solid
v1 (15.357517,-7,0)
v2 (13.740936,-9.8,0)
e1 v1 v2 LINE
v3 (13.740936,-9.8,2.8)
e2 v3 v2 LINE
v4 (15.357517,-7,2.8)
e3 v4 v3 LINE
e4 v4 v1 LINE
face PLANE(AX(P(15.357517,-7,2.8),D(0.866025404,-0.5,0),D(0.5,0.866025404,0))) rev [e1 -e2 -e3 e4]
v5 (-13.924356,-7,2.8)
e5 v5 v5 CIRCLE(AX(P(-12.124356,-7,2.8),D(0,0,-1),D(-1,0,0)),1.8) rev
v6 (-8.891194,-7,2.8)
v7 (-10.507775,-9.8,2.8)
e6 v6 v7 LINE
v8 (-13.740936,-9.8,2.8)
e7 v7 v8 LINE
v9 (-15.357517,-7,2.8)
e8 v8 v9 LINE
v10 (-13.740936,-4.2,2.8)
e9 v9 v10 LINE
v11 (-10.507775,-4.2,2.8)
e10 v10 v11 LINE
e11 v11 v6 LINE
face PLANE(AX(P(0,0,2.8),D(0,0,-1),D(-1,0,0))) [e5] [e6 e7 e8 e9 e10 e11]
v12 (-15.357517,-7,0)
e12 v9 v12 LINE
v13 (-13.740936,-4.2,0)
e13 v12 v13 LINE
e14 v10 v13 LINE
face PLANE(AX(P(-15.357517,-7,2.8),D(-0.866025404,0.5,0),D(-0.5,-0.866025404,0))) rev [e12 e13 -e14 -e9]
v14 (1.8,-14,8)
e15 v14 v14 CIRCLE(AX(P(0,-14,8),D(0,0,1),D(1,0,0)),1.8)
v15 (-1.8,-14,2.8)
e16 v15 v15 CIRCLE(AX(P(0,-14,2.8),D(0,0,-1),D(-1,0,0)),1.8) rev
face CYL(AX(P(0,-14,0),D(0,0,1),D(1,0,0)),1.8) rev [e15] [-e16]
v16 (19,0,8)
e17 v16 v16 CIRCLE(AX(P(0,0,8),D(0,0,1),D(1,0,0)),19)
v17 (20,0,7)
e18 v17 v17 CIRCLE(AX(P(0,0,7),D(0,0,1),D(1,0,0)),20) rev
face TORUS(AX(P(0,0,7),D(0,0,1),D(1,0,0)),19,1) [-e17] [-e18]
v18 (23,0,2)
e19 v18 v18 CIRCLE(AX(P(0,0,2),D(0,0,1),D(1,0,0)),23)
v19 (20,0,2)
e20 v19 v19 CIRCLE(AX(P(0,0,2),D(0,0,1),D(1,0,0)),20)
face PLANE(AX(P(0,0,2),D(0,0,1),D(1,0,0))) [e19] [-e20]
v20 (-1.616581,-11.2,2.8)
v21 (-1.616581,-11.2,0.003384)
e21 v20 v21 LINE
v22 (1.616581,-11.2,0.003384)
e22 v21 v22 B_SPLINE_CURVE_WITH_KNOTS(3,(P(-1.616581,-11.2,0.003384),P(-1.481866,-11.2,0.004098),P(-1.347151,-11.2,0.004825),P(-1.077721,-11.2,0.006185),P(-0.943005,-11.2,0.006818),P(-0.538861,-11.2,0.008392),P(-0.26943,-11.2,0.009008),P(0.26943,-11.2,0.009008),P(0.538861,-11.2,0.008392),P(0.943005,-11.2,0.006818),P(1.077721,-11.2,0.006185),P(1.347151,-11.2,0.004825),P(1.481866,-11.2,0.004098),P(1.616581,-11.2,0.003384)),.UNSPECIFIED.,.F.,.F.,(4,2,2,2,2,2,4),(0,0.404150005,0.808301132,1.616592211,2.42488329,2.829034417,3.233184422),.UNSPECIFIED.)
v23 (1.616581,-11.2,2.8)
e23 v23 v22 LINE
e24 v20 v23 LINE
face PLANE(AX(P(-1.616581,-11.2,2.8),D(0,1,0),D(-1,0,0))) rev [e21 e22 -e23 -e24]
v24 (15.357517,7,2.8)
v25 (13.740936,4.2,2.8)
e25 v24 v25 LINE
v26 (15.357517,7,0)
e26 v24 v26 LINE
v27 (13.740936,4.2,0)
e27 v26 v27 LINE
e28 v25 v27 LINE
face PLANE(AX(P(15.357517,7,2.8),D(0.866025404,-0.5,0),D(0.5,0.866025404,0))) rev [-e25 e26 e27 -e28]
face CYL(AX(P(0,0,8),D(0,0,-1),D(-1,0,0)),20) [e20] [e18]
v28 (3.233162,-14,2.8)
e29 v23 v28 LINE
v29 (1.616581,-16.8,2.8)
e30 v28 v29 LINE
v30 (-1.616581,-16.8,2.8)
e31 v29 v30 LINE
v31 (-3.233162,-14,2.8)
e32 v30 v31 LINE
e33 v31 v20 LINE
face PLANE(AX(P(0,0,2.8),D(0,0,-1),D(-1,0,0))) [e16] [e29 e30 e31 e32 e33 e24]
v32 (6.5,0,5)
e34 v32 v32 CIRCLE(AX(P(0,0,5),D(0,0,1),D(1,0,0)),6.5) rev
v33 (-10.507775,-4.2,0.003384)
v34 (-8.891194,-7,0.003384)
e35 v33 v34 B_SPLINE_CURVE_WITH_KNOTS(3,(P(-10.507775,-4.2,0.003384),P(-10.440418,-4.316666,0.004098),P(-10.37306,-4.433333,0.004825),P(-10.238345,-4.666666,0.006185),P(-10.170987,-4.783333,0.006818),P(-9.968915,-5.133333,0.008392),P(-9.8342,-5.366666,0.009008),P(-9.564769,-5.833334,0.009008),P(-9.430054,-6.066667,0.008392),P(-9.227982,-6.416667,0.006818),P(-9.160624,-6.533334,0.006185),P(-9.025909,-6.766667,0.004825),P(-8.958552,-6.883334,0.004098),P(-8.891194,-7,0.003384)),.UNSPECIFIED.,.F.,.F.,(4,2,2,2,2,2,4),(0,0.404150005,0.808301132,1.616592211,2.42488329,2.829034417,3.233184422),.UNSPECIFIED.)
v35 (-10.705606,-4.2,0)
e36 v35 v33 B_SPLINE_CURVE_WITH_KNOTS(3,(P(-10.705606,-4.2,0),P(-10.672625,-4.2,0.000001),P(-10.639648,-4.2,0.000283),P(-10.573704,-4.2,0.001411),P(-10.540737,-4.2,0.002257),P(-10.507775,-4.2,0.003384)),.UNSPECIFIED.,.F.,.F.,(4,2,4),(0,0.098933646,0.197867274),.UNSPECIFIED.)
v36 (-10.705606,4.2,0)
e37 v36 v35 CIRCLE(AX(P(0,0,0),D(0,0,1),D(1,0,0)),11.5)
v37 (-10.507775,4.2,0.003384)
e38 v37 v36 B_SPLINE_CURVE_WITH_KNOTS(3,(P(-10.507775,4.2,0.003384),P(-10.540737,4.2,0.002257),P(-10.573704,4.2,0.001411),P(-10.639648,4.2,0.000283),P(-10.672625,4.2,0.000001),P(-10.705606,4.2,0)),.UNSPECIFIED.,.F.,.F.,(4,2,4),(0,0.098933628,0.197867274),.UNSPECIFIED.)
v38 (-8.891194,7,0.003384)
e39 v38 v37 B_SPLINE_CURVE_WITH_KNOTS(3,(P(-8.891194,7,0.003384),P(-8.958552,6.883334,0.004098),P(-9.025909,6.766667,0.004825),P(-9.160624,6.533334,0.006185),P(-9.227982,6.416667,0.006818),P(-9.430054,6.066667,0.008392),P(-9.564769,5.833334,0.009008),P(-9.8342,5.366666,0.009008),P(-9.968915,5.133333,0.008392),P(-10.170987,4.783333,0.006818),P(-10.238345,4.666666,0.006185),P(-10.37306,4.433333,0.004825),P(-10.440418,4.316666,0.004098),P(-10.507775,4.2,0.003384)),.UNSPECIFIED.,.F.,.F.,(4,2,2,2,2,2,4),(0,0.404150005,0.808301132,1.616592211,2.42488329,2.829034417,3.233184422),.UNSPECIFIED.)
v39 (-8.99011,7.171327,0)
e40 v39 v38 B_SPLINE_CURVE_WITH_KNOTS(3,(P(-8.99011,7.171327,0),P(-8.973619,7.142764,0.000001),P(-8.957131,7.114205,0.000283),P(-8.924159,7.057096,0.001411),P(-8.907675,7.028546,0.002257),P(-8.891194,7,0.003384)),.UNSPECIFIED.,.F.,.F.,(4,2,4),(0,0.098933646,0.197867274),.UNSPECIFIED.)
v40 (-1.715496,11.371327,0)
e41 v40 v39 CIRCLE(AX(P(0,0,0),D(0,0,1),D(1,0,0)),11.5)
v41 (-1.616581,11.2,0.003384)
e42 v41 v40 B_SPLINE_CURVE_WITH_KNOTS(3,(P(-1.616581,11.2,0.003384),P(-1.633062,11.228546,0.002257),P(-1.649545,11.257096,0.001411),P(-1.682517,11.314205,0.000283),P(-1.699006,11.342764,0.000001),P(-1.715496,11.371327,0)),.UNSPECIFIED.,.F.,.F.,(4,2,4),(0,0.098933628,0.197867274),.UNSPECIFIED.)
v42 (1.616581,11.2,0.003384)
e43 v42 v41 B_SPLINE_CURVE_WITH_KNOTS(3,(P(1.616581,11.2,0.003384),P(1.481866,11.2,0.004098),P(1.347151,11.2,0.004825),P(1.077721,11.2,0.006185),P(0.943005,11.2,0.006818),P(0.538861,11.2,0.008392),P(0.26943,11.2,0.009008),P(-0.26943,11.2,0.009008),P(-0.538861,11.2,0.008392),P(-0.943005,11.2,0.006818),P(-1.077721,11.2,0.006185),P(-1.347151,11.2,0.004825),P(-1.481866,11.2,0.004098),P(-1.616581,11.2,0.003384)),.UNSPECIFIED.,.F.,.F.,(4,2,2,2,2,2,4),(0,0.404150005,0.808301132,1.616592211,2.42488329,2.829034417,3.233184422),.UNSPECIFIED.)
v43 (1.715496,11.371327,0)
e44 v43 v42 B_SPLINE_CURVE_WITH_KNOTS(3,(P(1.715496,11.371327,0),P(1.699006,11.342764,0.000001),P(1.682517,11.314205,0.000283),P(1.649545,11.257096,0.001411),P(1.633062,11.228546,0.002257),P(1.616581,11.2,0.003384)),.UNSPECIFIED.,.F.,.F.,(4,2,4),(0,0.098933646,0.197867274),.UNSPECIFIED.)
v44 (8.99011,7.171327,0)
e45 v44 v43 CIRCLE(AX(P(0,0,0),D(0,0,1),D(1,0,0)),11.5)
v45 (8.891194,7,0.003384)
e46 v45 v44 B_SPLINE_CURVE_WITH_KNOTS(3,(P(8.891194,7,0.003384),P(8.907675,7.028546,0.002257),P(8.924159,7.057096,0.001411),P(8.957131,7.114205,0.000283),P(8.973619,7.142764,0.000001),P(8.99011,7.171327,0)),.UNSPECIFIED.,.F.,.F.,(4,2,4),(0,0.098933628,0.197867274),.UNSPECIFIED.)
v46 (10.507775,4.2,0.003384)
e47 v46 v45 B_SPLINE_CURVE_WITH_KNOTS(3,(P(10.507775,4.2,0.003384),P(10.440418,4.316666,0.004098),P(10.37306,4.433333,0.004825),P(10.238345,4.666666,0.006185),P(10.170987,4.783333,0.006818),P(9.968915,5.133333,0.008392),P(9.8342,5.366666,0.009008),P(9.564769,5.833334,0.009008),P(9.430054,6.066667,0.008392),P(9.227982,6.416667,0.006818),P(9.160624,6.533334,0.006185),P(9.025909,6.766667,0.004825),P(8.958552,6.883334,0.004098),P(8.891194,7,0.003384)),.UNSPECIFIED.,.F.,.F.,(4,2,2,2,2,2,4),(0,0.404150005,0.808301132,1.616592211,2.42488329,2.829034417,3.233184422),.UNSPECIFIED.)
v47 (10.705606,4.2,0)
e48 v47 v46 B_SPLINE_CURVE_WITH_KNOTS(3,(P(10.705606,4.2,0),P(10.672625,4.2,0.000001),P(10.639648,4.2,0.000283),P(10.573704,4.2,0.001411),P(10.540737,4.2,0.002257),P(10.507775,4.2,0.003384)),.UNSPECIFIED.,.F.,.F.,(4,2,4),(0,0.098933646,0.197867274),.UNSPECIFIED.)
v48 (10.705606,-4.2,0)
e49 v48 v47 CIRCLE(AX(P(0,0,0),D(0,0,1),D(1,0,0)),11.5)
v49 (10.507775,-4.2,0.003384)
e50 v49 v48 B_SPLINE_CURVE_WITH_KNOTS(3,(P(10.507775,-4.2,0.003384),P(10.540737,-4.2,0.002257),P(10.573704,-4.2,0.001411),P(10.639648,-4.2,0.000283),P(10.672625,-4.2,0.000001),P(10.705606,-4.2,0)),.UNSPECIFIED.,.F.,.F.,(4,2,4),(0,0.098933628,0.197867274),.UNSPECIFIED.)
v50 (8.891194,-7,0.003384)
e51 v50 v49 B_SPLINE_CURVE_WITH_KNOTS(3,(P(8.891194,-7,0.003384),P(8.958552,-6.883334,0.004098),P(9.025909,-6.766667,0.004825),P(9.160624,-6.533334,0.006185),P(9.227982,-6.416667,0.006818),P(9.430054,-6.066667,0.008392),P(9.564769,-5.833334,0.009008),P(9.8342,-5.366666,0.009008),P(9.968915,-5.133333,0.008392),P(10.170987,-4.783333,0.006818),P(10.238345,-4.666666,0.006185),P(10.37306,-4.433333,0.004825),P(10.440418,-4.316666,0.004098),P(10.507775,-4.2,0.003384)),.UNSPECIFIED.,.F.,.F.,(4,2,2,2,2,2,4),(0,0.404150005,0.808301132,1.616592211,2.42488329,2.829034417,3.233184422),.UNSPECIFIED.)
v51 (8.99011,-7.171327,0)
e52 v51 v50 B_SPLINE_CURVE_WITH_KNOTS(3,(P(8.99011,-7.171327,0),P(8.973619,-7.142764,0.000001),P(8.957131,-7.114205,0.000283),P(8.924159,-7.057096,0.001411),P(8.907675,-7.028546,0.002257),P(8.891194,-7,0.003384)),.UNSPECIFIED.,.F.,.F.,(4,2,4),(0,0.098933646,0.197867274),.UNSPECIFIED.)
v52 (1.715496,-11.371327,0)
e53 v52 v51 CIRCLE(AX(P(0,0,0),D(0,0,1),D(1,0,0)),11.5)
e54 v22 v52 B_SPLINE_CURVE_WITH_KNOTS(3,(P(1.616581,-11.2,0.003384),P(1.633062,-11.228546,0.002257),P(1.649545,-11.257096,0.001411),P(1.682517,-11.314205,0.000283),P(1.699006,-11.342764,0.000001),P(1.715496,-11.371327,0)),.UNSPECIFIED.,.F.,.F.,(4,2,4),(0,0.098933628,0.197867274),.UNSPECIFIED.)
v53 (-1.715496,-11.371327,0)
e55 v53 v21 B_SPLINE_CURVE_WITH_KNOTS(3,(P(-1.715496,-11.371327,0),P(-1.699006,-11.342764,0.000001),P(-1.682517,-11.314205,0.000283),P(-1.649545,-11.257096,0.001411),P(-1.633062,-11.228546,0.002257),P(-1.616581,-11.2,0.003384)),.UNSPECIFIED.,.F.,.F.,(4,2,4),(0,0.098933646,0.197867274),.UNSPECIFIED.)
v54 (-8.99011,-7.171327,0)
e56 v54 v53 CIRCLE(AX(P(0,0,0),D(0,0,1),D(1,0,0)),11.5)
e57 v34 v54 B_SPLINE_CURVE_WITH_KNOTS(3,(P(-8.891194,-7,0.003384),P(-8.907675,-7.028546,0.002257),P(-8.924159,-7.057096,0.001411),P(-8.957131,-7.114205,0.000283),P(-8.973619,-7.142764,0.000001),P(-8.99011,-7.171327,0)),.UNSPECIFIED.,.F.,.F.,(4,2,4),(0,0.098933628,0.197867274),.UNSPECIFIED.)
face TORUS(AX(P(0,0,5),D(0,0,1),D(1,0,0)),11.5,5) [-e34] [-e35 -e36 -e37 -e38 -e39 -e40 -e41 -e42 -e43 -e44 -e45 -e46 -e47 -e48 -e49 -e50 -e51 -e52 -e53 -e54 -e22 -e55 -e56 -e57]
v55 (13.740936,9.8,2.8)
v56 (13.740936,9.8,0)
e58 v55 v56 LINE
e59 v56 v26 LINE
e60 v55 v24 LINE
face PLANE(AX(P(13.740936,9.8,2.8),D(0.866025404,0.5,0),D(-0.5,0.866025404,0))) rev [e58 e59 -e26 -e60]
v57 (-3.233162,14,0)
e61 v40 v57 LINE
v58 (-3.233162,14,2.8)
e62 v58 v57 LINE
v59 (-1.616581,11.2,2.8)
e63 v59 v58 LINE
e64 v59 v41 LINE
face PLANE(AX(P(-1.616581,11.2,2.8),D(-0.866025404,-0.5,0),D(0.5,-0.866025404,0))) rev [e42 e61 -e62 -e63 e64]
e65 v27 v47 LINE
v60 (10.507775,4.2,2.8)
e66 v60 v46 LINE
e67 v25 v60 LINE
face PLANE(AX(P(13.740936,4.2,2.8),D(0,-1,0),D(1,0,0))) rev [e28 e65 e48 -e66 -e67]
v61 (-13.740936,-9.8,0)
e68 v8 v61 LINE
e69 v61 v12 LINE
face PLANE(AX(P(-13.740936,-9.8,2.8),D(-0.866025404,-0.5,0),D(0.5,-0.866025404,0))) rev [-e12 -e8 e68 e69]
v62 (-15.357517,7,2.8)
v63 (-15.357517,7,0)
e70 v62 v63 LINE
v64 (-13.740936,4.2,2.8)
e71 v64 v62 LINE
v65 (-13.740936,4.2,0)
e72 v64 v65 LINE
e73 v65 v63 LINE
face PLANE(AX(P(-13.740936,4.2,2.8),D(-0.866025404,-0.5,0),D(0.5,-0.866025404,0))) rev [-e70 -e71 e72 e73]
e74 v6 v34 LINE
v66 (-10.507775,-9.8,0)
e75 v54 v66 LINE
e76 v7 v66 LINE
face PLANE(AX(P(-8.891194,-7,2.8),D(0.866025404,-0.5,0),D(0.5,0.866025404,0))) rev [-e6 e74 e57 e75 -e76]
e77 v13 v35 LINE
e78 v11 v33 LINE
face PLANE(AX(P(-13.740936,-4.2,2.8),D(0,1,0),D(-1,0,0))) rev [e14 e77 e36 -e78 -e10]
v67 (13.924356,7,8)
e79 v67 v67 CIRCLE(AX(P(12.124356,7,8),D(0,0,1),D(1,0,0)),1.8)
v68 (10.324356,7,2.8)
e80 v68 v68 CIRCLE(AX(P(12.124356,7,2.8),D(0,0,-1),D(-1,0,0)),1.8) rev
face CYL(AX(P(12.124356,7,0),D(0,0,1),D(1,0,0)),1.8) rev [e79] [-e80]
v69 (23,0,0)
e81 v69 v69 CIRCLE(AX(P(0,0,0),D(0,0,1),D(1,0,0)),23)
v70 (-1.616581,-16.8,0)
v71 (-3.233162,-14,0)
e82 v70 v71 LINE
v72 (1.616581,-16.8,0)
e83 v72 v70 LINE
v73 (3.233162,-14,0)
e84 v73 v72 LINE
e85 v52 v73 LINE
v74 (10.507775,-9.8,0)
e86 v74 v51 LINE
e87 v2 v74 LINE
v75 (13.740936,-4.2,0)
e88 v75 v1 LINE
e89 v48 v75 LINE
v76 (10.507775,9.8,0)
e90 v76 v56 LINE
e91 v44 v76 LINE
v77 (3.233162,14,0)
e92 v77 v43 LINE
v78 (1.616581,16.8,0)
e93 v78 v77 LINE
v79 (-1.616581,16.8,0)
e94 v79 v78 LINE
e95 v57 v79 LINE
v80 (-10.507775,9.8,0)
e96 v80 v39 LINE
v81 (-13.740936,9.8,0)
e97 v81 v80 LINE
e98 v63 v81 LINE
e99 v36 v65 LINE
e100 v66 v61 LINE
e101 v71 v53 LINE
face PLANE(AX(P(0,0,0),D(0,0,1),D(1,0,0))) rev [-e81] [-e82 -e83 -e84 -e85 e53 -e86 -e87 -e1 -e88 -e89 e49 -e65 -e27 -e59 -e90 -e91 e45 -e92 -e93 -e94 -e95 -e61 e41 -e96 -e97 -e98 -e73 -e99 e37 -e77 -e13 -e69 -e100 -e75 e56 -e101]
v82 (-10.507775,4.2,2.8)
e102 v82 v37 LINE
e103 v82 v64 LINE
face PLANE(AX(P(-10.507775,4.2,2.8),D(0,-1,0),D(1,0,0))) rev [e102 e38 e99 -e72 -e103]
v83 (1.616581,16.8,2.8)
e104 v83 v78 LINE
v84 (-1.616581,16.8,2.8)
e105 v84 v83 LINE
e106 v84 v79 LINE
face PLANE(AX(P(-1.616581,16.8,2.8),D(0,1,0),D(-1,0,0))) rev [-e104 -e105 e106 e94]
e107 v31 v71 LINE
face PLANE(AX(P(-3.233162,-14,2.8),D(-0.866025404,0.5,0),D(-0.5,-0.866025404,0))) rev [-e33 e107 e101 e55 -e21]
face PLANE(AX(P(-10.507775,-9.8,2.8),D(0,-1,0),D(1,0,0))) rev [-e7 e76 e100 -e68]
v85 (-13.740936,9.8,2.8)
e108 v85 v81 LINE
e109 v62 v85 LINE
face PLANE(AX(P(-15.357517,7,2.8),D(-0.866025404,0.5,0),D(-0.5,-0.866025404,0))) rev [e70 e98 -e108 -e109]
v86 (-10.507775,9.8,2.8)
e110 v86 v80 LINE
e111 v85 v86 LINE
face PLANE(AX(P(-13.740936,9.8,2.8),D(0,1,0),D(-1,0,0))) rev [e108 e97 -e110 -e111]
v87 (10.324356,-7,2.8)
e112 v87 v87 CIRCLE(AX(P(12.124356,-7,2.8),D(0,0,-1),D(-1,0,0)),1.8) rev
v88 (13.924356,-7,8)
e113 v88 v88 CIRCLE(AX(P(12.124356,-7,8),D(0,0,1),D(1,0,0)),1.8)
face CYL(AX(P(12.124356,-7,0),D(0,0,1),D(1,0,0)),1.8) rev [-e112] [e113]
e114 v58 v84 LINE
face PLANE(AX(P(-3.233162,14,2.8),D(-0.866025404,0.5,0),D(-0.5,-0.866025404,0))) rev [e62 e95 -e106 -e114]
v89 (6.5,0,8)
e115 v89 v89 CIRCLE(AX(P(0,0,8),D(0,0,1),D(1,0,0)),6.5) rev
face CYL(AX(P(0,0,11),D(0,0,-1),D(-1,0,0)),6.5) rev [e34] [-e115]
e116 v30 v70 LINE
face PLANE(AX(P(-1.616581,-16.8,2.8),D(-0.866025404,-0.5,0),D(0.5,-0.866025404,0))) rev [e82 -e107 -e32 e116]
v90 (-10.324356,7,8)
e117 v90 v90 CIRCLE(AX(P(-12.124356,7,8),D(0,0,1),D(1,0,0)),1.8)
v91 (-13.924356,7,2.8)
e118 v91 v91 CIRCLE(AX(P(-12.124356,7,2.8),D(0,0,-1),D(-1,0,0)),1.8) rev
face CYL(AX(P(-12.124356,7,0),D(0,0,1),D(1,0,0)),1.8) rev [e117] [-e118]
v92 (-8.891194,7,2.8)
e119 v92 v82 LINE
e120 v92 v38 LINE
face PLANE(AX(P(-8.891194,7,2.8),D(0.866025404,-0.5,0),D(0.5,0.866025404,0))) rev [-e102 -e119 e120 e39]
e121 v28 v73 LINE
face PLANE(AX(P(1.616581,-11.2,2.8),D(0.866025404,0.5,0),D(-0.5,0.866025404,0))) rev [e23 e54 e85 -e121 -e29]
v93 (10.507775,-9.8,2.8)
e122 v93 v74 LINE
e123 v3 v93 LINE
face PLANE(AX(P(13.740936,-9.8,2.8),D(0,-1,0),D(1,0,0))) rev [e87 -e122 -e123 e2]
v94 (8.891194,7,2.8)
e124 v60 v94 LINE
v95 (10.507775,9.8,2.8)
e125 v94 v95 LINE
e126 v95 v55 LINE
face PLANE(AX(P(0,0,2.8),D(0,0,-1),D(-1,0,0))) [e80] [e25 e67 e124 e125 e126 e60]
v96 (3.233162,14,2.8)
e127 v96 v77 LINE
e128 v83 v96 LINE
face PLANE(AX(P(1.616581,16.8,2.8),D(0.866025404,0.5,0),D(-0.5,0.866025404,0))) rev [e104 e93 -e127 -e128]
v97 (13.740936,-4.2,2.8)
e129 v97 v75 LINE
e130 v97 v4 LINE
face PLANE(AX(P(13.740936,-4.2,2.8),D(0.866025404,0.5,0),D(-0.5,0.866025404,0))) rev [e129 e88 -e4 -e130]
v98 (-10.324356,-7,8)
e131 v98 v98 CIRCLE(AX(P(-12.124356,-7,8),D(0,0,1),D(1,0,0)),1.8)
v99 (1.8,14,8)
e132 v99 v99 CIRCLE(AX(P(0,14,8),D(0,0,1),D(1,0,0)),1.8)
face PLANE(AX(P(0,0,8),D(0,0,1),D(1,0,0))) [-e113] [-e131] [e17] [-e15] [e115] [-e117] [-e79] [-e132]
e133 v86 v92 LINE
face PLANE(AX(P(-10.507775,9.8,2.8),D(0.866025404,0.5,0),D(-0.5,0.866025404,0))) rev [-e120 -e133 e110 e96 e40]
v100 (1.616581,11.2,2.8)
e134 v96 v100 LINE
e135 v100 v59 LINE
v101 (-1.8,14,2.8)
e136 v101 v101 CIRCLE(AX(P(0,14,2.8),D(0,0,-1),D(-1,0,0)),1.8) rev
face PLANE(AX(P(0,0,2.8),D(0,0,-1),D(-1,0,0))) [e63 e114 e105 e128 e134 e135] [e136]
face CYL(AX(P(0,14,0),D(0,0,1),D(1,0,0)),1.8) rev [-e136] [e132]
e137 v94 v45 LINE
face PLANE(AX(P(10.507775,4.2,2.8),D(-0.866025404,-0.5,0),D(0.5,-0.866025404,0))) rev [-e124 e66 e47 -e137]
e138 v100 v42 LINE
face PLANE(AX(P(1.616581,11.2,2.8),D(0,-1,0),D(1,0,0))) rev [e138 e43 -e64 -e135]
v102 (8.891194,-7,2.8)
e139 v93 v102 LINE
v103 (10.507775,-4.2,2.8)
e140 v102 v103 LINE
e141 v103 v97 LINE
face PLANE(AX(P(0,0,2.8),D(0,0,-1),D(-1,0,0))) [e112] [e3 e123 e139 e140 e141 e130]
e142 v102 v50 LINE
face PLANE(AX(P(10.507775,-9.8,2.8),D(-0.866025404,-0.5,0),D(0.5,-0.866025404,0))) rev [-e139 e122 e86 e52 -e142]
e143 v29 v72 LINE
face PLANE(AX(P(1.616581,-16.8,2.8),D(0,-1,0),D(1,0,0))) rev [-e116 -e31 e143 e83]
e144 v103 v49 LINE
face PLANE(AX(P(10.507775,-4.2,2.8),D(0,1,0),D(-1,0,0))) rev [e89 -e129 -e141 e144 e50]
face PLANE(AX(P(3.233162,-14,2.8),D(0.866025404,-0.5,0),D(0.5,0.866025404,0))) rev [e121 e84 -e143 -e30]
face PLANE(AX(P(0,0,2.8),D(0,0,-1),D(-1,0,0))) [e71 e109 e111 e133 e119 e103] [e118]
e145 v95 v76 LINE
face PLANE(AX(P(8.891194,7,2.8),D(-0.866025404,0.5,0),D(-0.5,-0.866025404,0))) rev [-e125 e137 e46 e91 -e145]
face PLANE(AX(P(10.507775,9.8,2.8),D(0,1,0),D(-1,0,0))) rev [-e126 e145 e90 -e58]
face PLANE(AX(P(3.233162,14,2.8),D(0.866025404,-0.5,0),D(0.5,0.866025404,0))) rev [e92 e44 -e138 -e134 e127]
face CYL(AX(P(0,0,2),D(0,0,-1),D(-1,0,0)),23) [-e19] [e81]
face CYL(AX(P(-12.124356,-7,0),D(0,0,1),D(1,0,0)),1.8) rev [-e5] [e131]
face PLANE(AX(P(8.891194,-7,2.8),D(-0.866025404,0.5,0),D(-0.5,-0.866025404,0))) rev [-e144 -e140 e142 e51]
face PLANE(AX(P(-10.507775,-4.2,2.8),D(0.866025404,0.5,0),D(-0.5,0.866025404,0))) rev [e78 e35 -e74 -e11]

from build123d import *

# Parameters (mm, degrees)
SKETCH_1_R          = 23
EXTRUDE_1_DEPTH     = 2
SKETCH_2_R          = 20
EXTRUDE_2_DEPTH     = 6
SKETCH_3_R          = 1.8
CUT_EXTRUDE_1_DEPTH = 34.496268449
SKETCH_4_R          = 10
CUT_EXTRUDE_2_DEPTH = 34.496268449
FILLET_1_R          = 1
CUT_EXTRUDE_5_DEPTH = 2.8
EXTRUDE_START       = -11
SKETCH_9_R          = 10
SKETCH_9_R_2        = 6.5
EXTRUDE_3_DEPTH     = 11
SKETCH_10_R         = 10
SKETCH_10_R_2       = 8.5
CUT_EXTRUDE_6_DEPTH = 3
FILLET_3_R          = 1.5
FILLET_4_R          = 5
SKETCH_11_R         = 8.5
CUT_EXTRUDE_7_DEPTH = 34.496268473


with BuildPart() as part:
    # 草图1 → 凸台-拉伸1 (new body)
    with BuildSketch(Plane.XY):
        Circle(SKETCH_1_R)
    extrude(amount=EXTRUDE_1_DEPTH)

    # 草图2 → 凸台-拉伸2 (add)
    with BuildSketch(Plane.XY.offset(2)):
        Circle(SKETCH_2_R)
    extrude(amount=EXTRUDE_2_DEPTH)

    # 草图3 → 切除-拉伸1 (cut, through all)
    with BuildSketch(Plane.XY.offset(8)):
        with Locations((0, 14)):
            Circle(SKETCH_3_R)
        with Locations((12.124355653, 7)):
            Circle(SKETCH_3_R)
        with Locations((12.124355653, -7)):
            Circle(SKETCH_3_R)
        with Locations((0, -14)):
            Circle(SKETCH_3_R)
        with Locations((-12.124355653, -7)):
            Circle(SKETCH_3_R)
        with Locations((-12.124355653, 7)):
            Circle(SKETCH_3_R)
    extrude(amount=-CUT_EXTRUDE_1_DEPTH, mode=Mode.SUBTRACT)

    # 草图4 → 切除-拉伸2 (cut, through all)
    with BuildSketch(Plane.XY.offset(8)):
        Circle(SKETCH_4_R)
    extrude(amount=-CUT_EXTRUDE_2_DEPTH, mode=Mode.SUBTRACT)

    # 圆角1
    fillet_1_edges = [part.edges().sort_by_distance(p)[0] for p in [
        (-20, 0, 8),
    ]]
    fillet(fillet_1_edges, radius=FILLET_1_R)

    # 草图8 → 切除-拉伸5 (cut)
    with BuildSketch(Plane(origin=(0, 0, 0), x_dir=(-1, 0, 0), z_dir=(0, 0, -1))):
        Polygon((-10.507774899, 9.8), (-13.740936407, 9.8), (-15.35751716, 7), (-13.740936407, 4.2), (-10.507774899, 4.2), (-8.891194146, 7), align=None)
        Polygon((3.233161507, 14), (1.616580754, 16.8), (-1.616580754, 16.8), (-3.233161507, 14), (-1.616580754, 11.2), (1.616580754, 11.2), align=None)
        Polygon((13.740936407, 4.2), (15.35751716, 7), (13.740936407, 9.8), (10.507774899, 9.8), (8.891194146, 7), (10.507774899, 4.2), align=None)
        Polygon((10.507774899, -9.8), (13.740936407, -9.8), (15.35751716, -7), (13.740936407, -4.2), (10.507774899, -4.2), (8.891194146, -7), align=None)
        Polygon((-3.233161507, -14), (-1.616580754, -16.8), (1.616580754, -16.8), (3.233161507, -14), (1.616580754, -11.2), (-1.616580754, -11.2), align=None)
        Polygon((-13.740936407, -4.2), (-15.35751716, -7), (-13.740936407, -9.8), (-10.507774899, -9.8), (-8.891194146, -7), (-10.507774899, -4.2), align=None)
    extrude(amount=-CUT_EXTRUDE_5_DEPTH, mode=Mode.SUBTRACT)

    # 草图9 → 凸台-拉伸3 (add)
    with BuildSketch(Plane(origin=(0, 0, 0), x_dir=(-1, 0, 0), z_dir=(0, 0, -1)).offset(EXTRUDE_START)):
        Circle(SKETCH_9_R)
        Circle(SKETCH_9_R_2, mode=Mode.SUBTRACT)
    extrude(amount=EXTRUDE_3_DEPTH)

    # 草图10 → 切除-拉伸6 (cut)
    with BuildSketch(Plane.XY.offset(11)):
        Circle(SKETCH_10_R)
        Circle(SKETCH_10_R_2, mode=Mode.SUBTRACT)
    extrude(amount=-CUT_EXTRUDE_6_DEPTH, mode=Mode.SUBTRACT)

    # 圆角3
    fillet_3_edges = [part.edges().sort_by_distance(p)[0] for p in [
        (-8.5, 0, 11),
    ]]
    fillet(fillet_3_edges, radius=FILLET_3_R)

    # 圆角4
    # the kernel refuses this fillet: 5 mm, written as the material it takes off along each edge
    with BuildSketch(Plane(origin=(0, 0, 0), x_dir=(-1, 0, 0), z_dir=(0, -1, 0))) as fillet_4_piece_1:
        with BuildLine():
            CenterArc((6.5 + FILLET_4_R, -FILLET_4_R), FILLET_4_R, 90, 90)
            Line((6.5 + FILLET_4_R, 0), (6.5, 0))
            Line((6.5, 0), (6.5, -FILLET_4_R))
        make_face()
    revolve(axis=Axis((0, 0, 0), (0, 0, -1)), mode=Mode.SUBTRACT)

    # 草图11 → 切除-拉伸7 (cut, through all)
    with BuildSketch(Plane.XY.offset(8)):
        Circle(SKETCH_11_R)
    extrude(amount=CUT_EXTRUDE_7_DEPTH, mode=Mode.SUBTRACT)


solid = part.part
